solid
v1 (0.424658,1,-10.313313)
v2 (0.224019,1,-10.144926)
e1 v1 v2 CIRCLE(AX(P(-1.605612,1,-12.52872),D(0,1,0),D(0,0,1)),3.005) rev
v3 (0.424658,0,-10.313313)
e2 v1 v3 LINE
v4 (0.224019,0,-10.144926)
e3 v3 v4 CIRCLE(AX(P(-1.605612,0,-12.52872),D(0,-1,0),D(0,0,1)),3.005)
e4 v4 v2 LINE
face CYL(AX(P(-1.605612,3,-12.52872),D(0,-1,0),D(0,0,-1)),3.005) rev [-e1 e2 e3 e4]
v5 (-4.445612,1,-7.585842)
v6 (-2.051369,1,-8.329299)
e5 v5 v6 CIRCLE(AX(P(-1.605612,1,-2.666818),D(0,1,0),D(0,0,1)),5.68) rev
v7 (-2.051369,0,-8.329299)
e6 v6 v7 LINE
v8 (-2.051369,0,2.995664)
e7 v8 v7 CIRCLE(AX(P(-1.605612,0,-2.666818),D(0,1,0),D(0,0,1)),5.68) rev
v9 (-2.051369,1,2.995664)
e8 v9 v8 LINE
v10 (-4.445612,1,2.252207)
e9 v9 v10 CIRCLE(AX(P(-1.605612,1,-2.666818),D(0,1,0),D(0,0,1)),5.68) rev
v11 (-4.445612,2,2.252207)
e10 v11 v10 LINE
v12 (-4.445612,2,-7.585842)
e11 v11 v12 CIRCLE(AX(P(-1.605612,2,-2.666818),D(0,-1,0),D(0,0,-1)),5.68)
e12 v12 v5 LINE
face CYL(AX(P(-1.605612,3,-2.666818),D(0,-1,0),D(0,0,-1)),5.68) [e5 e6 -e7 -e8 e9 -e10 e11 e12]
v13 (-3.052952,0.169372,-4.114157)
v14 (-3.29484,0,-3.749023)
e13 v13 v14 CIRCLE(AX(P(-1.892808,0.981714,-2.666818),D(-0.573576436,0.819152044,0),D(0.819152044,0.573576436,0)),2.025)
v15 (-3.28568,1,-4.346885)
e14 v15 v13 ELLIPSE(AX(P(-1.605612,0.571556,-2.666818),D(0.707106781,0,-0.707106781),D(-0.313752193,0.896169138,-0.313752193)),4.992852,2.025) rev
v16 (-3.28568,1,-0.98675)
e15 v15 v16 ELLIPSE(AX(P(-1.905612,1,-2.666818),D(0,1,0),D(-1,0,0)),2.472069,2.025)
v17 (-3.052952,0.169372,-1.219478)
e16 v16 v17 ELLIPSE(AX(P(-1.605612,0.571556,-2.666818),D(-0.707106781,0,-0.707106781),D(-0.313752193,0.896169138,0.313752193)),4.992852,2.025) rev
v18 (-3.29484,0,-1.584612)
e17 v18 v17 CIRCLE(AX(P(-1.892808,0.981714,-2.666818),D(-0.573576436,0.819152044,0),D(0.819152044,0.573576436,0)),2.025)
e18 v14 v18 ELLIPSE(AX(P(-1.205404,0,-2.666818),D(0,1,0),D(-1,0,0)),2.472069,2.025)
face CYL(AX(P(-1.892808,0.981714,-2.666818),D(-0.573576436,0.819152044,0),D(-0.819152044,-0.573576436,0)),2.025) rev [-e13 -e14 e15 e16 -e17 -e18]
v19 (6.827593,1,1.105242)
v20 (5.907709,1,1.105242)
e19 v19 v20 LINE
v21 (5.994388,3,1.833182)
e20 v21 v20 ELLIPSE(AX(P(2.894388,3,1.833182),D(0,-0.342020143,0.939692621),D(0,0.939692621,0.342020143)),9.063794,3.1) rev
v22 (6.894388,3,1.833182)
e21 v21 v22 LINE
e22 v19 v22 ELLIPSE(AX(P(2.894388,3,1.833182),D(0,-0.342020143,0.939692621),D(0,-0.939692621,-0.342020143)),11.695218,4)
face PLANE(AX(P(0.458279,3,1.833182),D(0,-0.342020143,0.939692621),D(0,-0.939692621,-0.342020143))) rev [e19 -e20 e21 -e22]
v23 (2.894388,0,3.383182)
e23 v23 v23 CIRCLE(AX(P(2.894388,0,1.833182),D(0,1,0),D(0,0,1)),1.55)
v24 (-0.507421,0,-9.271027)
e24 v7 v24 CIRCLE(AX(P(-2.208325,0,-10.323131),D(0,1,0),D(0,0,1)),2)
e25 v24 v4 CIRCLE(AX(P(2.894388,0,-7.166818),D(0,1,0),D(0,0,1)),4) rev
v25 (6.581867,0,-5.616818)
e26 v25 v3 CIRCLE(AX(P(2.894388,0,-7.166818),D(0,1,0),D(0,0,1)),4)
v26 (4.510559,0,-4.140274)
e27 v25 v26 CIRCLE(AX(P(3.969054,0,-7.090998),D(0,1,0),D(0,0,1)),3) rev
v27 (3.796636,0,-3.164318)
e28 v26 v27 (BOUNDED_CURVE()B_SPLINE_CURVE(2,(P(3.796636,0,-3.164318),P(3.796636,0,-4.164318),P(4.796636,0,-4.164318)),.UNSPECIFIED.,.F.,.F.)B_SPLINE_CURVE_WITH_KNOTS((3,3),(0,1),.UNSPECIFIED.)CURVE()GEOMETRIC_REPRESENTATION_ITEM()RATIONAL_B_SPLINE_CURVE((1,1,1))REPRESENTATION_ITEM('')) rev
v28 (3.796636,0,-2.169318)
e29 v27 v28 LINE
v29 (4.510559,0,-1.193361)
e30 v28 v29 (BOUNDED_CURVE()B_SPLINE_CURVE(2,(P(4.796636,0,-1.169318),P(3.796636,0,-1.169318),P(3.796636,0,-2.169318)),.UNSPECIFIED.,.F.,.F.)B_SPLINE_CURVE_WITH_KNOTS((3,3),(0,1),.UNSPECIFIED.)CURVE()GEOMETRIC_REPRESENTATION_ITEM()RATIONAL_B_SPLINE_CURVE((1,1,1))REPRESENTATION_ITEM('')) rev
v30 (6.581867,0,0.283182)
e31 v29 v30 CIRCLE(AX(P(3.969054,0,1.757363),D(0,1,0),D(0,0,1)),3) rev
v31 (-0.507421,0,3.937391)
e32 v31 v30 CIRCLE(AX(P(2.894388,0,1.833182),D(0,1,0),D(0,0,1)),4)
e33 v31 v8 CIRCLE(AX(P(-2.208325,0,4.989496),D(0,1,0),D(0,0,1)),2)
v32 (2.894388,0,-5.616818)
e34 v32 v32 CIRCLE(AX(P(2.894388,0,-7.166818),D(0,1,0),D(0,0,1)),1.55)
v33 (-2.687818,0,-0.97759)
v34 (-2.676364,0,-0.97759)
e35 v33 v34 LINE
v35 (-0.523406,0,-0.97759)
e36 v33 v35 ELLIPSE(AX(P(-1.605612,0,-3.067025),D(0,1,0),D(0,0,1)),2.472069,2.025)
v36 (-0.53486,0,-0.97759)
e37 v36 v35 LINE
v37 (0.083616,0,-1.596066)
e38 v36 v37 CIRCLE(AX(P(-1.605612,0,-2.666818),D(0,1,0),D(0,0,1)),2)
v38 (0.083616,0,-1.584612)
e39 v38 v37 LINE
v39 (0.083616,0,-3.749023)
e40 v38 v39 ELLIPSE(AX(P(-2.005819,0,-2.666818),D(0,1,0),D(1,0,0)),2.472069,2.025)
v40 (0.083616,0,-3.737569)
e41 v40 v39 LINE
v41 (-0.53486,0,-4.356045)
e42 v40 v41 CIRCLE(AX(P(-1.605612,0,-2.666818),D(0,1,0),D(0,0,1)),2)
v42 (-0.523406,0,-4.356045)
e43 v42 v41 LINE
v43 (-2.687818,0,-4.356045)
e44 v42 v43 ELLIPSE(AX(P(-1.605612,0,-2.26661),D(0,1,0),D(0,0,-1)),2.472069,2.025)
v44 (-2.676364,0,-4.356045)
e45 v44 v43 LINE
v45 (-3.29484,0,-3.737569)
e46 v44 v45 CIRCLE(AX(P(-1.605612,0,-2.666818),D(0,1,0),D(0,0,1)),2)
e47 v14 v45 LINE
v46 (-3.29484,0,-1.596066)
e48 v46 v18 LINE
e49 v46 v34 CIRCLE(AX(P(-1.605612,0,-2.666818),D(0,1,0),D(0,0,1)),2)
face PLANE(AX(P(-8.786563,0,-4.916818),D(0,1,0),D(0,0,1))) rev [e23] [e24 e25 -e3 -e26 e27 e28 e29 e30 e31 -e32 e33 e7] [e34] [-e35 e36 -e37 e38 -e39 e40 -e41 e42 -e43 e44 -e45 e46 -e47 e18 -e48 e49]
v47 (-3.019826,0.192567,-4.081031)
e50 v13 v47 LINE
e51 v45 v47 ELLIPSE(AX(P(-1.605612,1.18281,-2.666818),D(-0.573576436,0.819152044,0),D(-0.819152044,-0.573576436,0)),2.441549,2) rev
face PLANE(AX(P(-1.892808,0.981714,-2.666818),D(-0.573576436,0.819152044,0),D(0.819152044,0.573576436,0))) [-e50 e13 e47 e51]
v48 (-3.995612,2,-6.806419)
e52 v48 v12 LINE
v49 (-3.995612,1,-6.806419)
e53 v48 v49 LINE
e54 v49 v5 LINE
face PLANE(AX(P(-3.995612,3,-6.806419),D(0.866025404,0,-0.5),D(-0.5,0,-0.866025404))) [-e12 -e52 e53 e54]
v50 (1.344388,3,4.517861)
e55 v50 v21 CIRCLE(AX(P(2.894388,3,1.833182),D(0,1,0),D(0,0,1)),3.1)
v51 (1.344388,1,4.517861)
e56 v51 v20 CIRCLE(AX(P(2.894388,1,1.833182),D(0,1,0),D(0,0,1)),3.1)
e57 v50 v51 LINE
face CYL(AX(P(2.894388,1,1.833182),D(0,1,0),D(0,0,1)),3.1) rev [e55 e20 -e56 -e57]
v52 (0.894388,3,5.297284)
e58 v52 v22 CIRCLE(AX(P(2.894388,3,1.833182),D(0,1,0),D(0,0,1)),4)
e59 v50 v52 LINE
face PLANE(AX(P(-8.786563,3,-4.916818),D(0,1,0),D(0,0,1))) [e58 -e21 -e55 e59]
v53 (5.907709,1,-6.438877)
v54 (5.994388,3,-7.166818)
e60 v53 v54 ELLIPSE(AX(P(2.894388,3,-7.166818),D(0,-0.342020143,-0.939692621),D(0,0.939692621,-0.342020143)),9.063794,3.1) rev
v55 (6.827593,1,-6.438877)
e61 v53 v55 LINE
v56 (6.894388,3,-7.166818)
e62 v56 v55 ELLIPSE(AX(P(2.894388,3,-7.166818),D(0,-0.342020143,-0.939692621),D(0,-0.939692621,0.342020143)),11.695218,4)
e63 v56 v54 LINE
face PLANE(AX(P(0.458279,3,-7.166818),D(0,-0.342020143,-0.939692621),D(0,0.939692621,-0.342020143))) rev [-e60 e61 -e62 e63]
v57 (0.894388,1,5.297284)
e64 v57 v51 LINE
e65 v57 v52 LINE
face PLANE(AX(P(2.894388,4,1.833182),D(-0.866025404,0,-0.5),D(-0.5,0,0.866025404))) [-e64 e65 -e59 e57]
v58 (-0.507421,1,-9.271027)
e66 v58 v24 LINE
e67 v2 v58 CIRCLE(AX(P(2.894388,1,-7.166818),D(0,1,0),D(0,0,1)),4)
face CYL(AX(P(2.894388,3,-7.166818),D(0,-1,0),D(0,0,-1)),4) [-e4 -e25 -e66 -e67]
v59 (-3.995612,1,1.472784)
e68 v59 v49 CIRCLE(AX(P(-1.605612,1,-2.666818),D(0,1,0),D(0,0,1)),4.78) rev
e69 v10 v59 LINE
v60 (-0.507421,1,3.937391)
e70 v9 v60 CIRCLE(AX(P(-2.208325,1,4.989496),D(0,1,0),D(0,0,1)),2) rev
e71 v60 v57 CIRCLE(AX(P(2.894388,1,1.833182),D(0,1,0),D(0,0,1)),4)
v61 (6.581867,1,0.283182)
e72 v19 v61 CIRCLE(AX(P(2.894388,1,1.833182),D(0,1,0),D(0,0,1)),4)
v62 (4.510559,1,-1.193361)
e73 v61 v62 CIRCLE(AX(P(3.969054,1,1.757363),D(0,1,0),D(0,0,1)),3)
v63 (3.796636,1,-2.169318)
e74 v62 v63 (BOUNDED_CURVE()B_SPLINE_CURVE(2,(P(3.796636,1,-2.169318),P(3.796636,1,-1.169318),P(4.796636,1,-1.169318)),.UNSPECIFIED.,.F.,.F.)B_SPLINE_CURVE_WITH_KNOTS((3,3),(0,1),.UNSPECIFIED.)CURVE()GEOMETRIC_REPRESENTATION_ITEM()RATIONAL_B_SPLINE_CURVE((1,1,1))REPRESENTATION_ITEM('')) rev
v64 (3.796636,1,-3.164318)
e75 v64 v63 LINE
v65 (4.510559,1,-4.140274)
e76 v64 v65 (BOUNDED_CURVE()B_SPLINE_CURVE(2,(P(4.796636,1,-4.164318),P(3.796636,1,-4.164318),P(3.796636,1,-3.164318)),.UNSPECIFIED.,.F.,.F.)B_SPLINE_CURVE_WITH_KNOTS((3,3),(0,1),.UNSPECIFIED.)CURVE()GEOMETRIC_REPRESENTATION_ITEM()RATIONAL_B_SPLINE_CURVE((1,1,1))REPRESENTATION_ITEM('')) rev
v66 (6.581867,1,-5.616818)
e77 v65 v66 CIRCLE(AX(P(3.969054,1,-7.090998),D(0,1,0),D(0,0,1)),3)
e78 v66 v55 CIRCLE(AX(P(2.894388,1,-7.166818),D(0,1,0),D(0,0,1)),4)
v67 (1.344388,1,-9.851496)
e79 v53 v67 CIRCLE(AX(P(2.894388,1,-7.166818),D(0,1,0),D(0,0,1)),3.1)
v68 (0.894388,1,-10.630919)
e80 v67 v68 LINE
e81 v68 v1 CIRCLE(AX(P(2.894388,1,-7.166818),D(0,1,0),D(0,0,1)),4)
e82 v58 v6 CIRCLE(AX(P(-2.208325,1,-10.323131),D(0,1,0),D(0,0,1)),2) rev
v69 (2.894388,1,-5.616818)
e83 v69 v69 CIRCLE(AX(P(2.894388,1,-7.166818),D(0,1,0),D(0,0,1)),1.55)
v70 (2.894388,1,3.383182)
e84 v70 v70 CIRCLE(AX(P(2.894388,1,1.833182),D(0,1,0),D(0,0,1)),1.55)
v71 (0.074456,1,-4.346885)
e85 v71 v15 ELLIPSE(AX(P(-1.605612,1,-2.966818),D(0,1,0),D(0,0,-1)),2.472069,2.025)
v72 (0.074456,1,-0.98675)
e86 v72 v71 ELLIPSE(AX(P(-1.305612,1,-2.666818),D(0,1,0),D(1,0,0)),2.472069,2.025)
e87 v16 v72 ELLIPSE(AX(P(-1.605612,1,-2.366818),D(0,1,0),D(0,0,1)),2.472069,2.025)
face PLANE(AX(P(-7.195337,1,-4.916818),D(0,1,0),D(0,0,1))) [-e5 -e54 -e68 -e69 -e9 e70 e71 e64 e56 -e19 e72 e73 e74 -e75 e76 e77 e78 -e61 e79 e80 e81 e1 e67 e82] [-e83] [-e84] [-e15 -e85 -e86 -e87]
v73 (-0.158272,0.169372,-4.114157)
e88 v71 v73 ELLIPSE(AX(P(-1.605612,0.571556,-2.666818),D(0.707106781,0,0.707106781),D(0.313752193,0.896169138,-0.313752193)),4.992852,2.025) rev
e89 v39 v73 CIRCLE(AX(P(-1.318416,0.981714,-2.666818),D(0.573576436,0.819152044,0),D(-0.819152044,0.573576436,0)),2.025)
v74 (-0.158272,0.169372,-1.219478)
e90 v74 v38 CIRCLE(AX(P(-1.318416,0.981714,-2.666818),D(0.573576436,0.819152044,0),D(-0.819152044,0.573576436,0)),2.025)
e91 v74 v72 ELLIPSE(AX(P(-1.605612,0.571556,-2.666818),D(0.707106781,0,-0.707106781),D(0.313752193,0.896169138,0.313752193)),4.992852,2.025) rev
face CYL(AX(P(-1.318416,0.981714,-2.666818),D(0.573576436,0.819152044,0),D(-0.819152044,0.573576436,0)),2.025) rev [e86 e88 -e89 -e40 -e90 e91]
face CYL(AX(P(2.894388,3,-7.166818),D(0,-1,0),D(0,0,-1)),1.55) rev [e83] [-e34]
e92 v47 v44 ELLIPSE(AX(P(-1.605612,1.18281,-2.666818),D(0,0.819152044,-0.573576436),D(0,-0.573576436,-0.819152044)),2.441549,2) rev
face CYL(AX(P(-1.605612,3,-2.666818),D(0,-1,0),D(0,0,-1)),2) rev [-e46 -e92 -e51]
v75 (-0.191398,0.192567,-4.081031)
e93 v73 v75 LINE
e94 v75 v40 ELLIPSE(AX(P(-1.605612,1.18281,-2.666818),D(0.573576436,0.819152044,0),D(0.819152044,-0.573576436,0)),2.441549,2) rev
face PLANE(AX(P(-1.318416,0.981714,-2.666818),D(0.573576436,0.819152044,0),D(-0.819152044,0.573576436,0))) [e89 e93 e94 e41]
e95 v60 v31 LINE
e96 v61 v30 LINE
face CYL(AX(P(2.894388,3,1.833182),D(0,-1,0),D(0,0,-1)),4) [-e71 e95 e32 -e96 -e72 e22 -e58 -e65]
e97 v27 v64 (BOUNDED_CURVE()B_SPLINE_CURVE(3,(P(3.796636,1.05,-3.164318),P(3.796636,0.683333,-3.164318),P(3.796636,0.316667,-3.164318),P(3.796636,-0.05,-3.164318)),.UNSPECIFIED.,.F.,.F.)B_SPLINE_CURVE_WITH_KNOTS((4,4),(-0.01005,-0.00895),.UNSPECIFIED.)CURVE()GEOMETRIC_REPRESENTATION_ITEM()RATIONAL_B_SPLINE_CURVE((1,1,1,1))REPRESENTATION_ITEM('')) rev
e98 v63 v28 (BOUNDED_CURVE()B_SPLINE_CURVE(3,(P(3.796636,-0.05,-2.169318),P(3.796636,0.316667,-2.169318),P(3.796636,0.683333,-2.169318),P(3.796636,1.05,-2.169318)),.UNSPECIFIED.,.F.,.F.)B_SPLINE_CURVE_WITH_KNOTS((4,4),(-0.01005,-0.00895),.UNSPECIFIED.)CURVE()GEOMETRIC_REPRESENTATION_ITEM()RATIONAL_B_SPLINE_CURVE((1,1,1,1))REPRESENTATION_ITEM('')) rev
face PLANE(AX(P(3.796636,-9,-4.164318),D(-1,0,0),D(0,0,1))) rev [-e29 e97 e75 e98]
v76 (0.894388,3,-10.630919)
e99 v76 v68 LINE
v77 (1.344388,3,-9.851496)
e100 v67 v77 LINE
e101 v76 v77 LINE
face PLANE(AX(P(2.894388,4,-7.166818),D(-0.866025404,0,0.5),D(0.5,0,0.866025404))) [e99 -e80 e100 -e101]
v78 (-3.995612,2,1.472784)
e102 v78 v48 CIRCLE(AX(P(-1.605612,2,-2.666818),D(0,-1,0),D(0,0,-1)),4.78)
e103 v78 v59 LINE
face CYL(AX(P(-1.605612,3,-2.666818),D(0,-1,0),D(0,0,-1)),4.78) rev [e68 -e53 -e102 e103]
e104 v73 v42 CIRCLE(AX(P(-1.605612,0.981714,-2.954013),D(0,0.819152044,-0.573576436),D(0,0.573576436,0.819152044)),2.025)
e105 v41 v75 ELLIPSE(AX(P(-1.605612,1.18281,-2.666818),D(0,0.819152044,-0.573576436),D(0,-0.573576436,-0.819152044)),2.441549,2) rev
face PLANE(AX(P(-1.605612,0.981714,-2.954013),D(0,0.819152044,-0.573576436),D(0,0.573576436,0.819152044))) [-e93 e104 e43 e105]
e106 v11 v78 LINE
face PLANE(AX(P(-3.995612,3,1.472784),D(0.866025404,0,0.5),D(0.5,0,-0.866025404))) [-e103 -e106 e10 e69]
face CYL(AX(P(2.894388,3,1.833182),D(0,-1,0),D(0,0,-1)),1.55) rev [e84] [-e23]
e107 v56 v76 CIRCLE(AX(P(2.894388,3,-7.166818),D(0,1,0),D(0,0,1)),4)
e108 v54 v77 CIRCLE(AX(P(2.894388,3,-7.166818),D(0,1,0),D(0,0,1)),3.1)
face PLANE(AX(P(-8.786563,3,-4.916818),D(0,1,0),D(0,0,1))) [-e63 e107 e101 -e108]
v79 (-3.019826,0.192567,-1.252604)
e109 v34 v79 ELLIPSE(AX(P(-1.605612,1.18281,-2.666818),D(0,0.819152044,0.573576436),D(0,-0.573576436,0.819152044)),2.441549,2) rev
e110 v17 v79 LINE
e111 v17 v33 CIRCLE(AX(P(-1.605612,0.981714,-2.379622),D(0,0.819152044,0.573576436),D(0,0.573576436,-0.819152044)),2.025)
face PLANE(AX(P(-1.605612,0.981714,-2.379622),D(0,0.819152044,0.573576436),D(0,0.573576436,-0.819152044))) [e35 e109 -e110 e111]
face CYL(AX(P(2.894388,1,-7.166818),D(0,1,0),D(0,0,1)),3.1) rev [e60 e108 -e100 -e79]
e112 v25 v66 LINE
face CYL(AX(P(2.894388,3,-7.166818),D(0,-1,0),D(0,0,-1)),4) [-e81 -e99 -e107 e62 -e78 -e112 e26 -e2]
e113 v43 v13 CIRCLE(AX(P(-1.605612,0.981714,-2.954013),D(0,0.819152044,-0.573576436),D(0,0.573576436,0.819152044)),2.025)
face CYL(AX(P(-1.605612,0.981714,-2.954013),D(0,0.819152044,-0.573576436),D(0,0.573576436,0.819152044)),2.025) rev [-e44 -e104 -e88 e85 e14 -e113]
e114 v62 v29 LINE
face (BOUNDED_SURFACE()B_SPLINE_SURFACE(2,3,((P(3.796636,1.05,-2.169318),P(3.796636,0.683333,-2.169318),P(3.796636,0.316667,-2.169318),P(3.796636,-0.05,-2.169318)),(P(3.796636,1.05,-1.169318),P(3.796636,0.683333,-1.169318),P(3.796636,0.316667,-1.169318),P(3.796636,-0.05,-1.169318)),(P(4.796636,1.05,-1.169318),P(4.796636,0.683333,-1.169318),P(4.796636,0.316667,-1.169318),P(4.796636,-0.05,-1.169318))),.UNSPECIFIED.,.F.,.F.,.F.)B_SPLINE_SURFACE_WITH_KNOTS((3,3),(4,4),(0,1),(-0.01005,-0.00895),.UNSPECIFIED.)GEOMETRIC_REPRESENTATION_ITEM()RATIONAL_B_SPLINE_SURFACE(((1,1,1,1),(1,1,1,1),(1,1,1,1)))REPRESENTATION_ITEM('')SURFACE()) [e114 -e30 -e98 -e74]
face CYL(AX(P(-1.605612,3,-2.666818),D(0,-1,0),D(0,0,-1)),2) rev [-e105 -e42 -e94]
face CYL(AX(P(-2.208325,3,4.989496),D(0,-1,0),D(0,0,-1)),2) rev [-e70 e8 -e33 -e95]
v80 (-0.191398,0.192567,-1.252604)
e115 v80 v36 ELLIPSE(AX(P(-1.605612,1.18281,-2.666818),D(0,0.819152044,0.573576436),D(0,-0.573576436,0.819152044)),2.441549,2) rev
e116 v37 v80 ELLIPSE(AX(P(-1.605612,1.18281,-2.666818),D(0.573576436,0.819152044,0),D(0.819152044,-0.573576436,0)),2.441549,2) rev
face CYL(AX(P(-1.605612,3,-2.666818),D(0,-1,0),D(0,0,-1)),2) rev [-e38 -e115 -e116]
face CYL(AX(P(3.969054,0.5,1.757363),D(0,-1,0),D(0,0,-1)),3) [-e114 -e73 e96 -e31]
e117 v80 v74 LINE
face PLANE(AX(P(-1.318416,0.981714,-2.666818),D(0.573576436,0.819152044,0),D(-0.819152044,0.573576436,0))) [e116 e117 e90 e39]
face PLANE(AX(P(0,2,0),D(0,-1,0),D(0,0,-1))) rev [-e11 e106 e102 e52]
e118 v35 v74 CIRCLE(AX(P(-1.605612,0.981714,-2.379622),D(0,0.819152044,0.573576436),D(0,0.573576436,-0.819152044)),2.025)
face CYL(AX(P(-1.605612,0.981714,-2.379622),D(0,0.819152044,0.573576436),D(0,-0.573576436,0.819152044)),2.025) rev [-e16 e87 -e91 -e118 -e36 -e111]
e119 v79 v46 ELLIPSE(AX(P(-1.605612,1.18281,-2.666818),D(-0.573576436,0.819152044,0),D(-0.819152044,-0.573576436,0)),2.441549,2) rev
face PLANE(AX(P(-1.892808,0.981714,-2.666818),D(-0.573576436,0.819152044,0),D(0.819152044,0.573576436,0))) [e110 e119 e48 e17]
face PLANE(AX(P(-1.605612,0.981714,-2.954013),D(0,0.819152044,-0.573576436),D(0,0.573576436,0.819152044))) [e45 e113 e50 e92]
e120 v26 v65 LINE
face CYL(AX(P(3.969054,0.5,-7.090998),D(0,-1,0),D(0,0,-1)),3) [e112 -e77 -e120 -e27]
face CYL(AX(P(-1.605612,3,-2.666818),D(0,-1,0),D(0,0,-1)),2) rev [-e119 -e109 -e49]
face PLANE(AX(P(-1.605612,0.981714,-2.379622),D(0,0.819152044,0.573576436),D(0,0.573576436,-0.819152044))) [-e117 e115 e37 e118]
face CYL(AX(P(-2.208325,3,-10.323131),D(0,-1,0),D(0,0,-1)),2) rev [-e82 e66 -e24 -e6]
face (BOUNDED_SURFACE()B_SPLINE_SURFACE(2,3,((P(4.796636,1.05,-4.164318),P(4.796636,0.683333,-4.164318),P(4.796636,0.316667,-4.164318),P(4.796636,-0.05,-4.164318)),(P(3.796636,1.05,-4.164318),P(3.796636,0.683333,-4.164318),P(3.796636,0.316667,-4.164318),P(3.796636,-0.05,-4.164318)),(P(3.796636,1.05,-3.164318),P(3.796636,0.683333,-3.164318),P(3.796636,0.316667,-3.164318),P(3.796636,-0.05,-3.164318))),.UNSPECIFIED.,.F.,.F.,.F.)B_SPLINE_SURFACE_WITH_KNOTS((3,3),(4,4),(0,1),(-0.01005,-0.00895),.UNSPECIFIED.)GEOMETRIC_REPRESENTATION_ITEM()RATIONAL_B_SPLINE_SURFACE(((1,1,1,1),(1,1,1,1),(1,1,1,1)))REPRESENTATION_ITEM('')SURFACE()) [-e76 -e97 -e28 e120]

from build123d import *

# Parameters (mm, degrees)
SKETCH1_R                = 1.55
BOSS_EXTRUDE1_DEPTH      = 3
CUT_EXTRUDE1_DEPTH       = 2
SKETCH3_W                = 5.9
SKETCH3_H                = 3
BOSS_EXTRUDE2_DEPTH      = 8
SKETCH4_W                = 13.659458738
SKETCH4_H                = 9
CUT_EXTRUDE2_DEPTH       = 2
CUT_EXTRUDE2_DRAFT       = -20
SKETCH5_R                = 0.75
CUT_EXTRUDE3_DEPTH       = 1.3
CUT_EXTRUDE4_DEPTH       = 2
CUT_EXTRUDE5_DEPTH       = 2
CUT_EXTRUDE6_DEPTH       = 2
CUT_EXTRUDE7_DEPTH       = 18.586771109
CUT_EXTRUDE7_DEPTH_BACK  = 18.586771109
SKETCH11_R               = 2
SKETCH12_R               = 2.025
CUT_EXTRUDE8_DEPTH       = 6
CIRPATTERN1_COUNT        = 4
SKETCH13_W               = 4.09775222
SKETCH13_H               = 2.995
CUT_EXTRUDE9_DEPTH       = 10
CUT_EXTRUDE10_START      = -0.177953
SKETCH14_W               = 5.9
SKETCH14_H               = 1
CUT_EXTRUDE10_DEPTH      = 0.177953
FILLET1_SIZE             = 1
SKETCH17_R               = 1.662744167
BOSS_EXTRUDE4_DEPTH      = 1
SKETCH16_R               = 1.665674875
BOSS_EXTRUDE3_DEPTH      = 1
CUT_EXTRUDE11_DEPTH      = 18.453079278
CUT_EXTRUDE11_DEPTH_BACK = 18.453079278
SKETCH18_W               = 2.600219514
SKETCH18_H               = 5.959262744
CUT_EXTRUDE12_DEPTH      = 18.309245399
BOSS_EXTRUDE5_START      = -3
BOSS_EXTRUDE5_DEPTH      = 3
CUT_EXTRUDE13_DEPTH      = 3
SKETCH22_W               = 6.55065816
SKETCH22_H               = 15.562546266
CUT_EXTRUDE14_DEPTH      = 1
SKETCH23_W               = 5.9
SKETCH23_H               = 1
CUT_EXTRUDE15_DEPTH      = 6.491471
FILLET2_R                = 3


with BuildPart() as part:
    # Sketch1 → Boss-Extrude1 (new body)
    with BuildSketch(Plane(origin=(0, 0, 0), x_dir=(1, 0, 0), z_dir=(0, 1, 0))):
        with BuildLine():
            ThreePointArc((-3.635881537, 10.313312638), (-8.934039083, 9.995244626), (-9.252107096, 4.69708708))
            ThreePointArc((-9.252107096, 4.69708708), (-8.462514606, 2.666817501), (-9.252107096, 0.636547923))
            ThreePointArc((-9.252107096, 0.636547923), (-8.934039083, -4.661609623), (-3.635881537, -4.979677635))
            ThreePointArc((-3.635881537, -4.979677635), (-1.736579677, -4.192940503), (0.224018718, -4.811290568))
            ThreePointArc((0.224018718, -4.811290568), (5.628690512, -4.752701294), (6.040883178, 0.636547923))
            ThreePointArc((6.040883178, 0.636547923), (5.251290689, 2.666817501), (6.040883178, 4.69708708))
            ThreePointArc((6.040883178, 4.69708708), (5.722815166, 9.995244626), (0.42465762, 10.313312638))
            ThreePointArc((0.42465762, 10.313312638), (-1.605611959, 9.523720149), (-3.635881537, 10.313312638))
        make_face()
        with Locations(Location((-6.105611959, 7.166817501, 0), (0, 0, 270))):
            Circle(SKETCH1_R, mode=Mode.SUBTRACT)
        with Locations(Location((2.894388041, 7.166817501, 0), (0, 0, 270))):
            Circle(SKETCH1_R, mode=Mode.SUBTRACT)
        with Locations(Location((-6.105611959, -1.833182499, 0), (0, 0, 270))):
            Circle(SKETCH1_R, mode=Mode.SUBTRACT)
        with Locations(Location((2.894388041, -1.833182499, 0), (0, 0, 270))):
            Circle(SKETCH1_R, mode=Mode.SUBTRACT)
    extrude(amount=BOSS_EXTRUDE1_DEPTH)

    # Sketch2 → Cut-Extrude1 (cut)
    with BuildSketch(Plane(origin=(0, 3, 0), x_dir=(1, 0, 0), z_dir=(0, 1, 0))):
        with BuildLine():
            ThreePointArc((-3.492463443, 8.83458692), (-8.29764298, 9.358848523), (-7.773381378, 4.553668986))
            ThreePointArc((-7.773381378, 4.553668986), (-6.33006143, 2.666817501), (-7.773381378, 0.779966017))
            ThreePointArc((-7.773381378, 0.779966017), (-8.29764298, -4.02521352), (-3.492463443, -3.500951917))
            ThreePointArc((-3.492463443, -3.500951917), (-1.605611959, -2.05763197), (0.281239525, -3.500951917))
            ThreePointArc((0.281239525, -3.500951917), (5.086419063, -4.02521352), (4.56215746, 0.779966017))
            ThreePointArc((4.56215746, 0.779966017), (3.118837513, 2.666817501), (4.56215746, 4.553668986))
            ThreePointArc((4.56215746, 4.553668986), (5.086419063, 9.358848523), (0.281239525, 8.83458692))
            ThreePointArc((0.281239525, 8.83458692), (-1.605611959, 7.391266973), (-3.492463443, 8.83458692))
        make_face()
    extrude(amount=-CUT_EXTRUDE1_DEPTH, mode=Mode.SUBTRACT)

    # Sketch3 → Boss-Extrude2 (add)
    with BuildSketch(Plane(origin=(5.251290689, 0, -2.666817501), x_dir=(0, 0, -1), z_dir=(1, 0, 0))):
        with Locations((0, 1.5)):
            Rectangle(SKETCH3_W, SKETCH3_H)
    extrude(amount=BOSS_EXTRUDE2_DEPTH)


with BuildPart() as cut_extrude2_tool:
    # Sketch4 → Cut-Extrude2 (with draft: the straight prism first)
    with BuildSketch(Plane(origin=(0, 3, 0), x_dir=(1, 0, 0), z_dir=(0, 1, 0))):
        with Locations((7.288008407, 2.666817501)):
            Rectangle(SKETCH4_W, SKETCH4_H)
    extrude(amount=-CUT_EXTRUDE2_DEPTH)
    # Cut-Extrude2: the draft: its side faces are tilted about the plane it starts from
    cut_extrude2_sides = [cut_extrude2_tool.faces().sort_by_distance(p)[0] for p in [
        (7.288008407, 2, 1.833182499),
        (14.117737776, 2, -2.666817501),
        (7.288008407, 2, -7.166817501),
        (0.458279038, 2, -2.666817501),
    ]]
    draft(cut_extrude2_sides, Plane(origin=(0, 3, 0), x_dir=(1, 0, 0), z_dir=(0, 1, 0)), CUT_EXTRUDE2_DRAFT)


with BuildPart() as part_1:
    add(part.part)

    # Cut-Extrude2: cut by cut_extrude2_tool
    add(cut_extrude2_tool.part, mode=Mode.SUBTRACT)

    # Sketch5 → Cut-Extrude3 (cut)
    with BuildSketch(Plane(origin=(0, 1, 0), x_dir=(1, 0, 0), z_dir=(0, 1, 0))):
        with Locations(Location((10.394388041, 2.716817501, 0), (0, 0, 270))):
            Circle(SKETCH5_R)
    extrude(amount=-CUT_EXTRUDE3_DEPTH, mode=Mode.SUBTRACT)

    # Sketch6 → Cut-Extrude4 (cut)
    with BuildSketch(Plane(origin=(0, 3, 0), x_dir=(1, 0, 0), z_dir=(0, 1, 0))):
        with BuildLine():
            Line((-3.492463443, -3.500951917), (-3.702450132, -1.327552789))
            Line((-3.702450132, -1.327552789), (0.368176256, -0.93426223))
            Line((0.368176256, -0.93426223), (0.281239525, -3.500951917))
            ThreePointArc((0.281239525, -3.500951917), (-1.605611959, -2.432230608), (-3.492463443, -3.500951917))
        make_face()
    extrude(amount=-CUT_EXTRUDE4_DEPTH, mode=Mode.SUBTRACT)

    # Sketch9 → Cut-Extrude5 (cut)
    with BuildSketch(Plane(origin=(0, 3, 0), x_dir=(1, 0, 0), z_dir=(0, 1, 0))):
        with BuildLine():
            Line((-7.773381378, 4.553668986), (-3.245284386, 5.2751304))
            Line((-3.245284386, 5.2751304), (-4.565802385, 0.235004819))
            Line((-4.565802385, 0.235004819), (-7.773381378, 0.779966017))
            ThreePointArc((-7.773381378, 0.779966017), (-6.704660068, 2.666817501), (-7.773381378, 4.553668986))
        make_face()
    extrude(amount=-CUT_EXTRUDE5_DEPTH, mode=Mode.SUBTRACT)

    # Sketch10 → Cut-Extrude6 (cut)
    with BuildSketch(Plane(origin=(0, 3, 0), x_dir=(1, 0, 0), z_dir=(0, 1, 0))):
        with BuildLine():
            Line((-3.492463443, 8.83458692), (-4.484720145, 5.022165409))
            Line((-4.484720145, 5.022165409), (-0.857976827, 4.078235061))
            Line((-0.857976827, 4.078235061), (0.281239525, 8.83458692))
            ThreePointArc((0.281239525, 8.83458692), (-1.605611959, 7.765865611), (-3.492463443, 8.83458692))
        make_face()
    extrude(amount=-CUT_EXTRUDE6_DEPTH, mode=Mode.SUBTRACT)

    # Sketch11 → Cut-Extrude7 (cut, two sides: drawn at the far end of the back side and taken through both)
    with BuildSketch(Plane.XZ.offset(-CUT_EXTRUDE7_DEPTH_BACK)):
        with Locations(Location((-1.605611959, -2.666817501, 0), (0, 0, 90))):
            Circle(SKETCH11_R)
    extrude(amount=CUT_EXTRUDE7_DEPTH + CUT_EXTRUDE7_DEPTH_BACK, mode=Mode.SUBTRACT)

    # Sketch12 → Cut-Extrude8 (cut)
    with BuildSketch(Plane(origin=(3.468967433, 4.954198925, 0), x_dir=(0.8191520442889871, -0.5735764363510527, -5.842048773291199e-15), z_dir=(0.5735764363510527, 0.8191520442889871, 8.343310310865899e-15))):
        with Locations((-1.643071141, 2.666817501)):
            Circle(SKETCH12_R)
    cut_extrude8 = extrude(amount=-CUT_EXTRUDE8_DEPTH, mode=Mode.SUBTRACT)

    # CirPattern1: Cut-Extrude8 ×4 about axis
    cirpattern1_axis = Axis((-1.605611959, 0, -2.666817501), (0, 1, 0))
    for i in range(1, CIRPATTERN1_COUNT):
        add(cut_extrude8.rotate(cirpattern1_axis, i * 360 / CIRPATTERN1_COUNT), mode=Mode.SUBTRACT)

    # Sketch13 → Cut-Extrude9 (cut)
    with BuildSketch(Plane(origin=(0, 1, 0), x_dir=(1, 0, 0), z_dir=(0, 1, 0))):
        with Locations((5.845511931, 2.666817501)):
            Rectangle(SKETCH13_W, SKETCH13_H)
    extrude(amount=-CUT_EXTRUDE9_DEPTH, mode=Mode.SUBTRACT)

    # Sketch14 → Cut-Extrude10 (cut)
    with BuildSketch(Plane(origin=(13.251290689, 0, 0), x_dir=(0, 0, -1), z_dir=(1, 0, 0)).offset(CUT_EXTRUDE10_START)):
        with Locations((2.666817501, 0.5)):
            Rectangle(SKETCH14_W, SKETCH14_H)
    extrude(amount=CUT_EXTRUDE10_DEPTH, mode=Mode.SUBTRACT)

    # Fillet1
    # a fillet whose section is not a circle: 1 mm, written as the material it adds along each edge
    with BuildSketch(Plane(origin=(7.894388041, 1, -4.164317501), x_dir=(-1, 0, 0), z_dir=(0, -1, 0)), Plane(origin=(3.796635821, 1, -4.164317501), x_dir=(0, 0, 1), z_dir=(0, -1, 0))) as fillet1_piece_1:
        with BuildLine():
            Bezier((FILLET1_SIZE, 0), (0, 0), (0, -FILLET1_SIZE), weights=[1, 1, 1])
            Line((0, -FILLET1_SIZE), (0, 0))
            Line((0, 0), (FILLET1_SIZE, 0))
        make_face()
    extrude(amount=1)
    with BuildSketch(Plane(origin=(7.894388041, 1, -1.169317501), x_dir=(-1, 0, 0), z_dir=(0, -1, 0)), Plane(origin=(3.796635821, 1, -1.169317501), x_dir=(0, 0, -1), z_dir=(0, -1, 0))) as fillet1_piece_2:
        with BuildLine():
            Bezier((FILLET1_SIZE, 0), (0, 0), (0, FILLET1_SIZE), weights=[1, 1, 1])
            Line((0, FILLET1_SIZE), (0, 0))
            Line((0, 0), (FILLET1_SIZE, 0))
        make_face()
    extrude(amount=1)

    # Sketch17 → Boss-Extrude4 (add)
    with BuildSketch(Plane(origin=(0, 1, 0), x_dir=(1, 0, 0), z_dir=(0, 1, 0))):
        with Locations((-6.105611959, -1.833182499)):
            Circle(SKETCH17_R)
    extrude(amount=-BOSS_EXTRUDE4_DEPTH)

    # Sketch16 → Boss-Extrude3 (add)
    with BuildSketch(Plane(origin=(0, 1, 0), x_dir=(1, 0, 0), z_dir=(0, 1, 0))):
        with Locations((-6.105611959, 7.166817501)):
            Circle(SKETCH16_R)
    extrude(amount=-BOSS_EXTRUDE3_DEPTH)

    # Sketch15 → Cut-Extrude11 (cut, two sides: drawn at the far end of the back side and taken through both)
    with BuildSketch(Plane.XZ.offset(-CUT_EXTRUDE11_DEPTH_BACK)):
        with BuildLine():
            Line((6.894388041, -7.166817501), (6.894388041, -13.928074113))
            Line((6.894388041, -13.928074113), (-13.514201906, -13.928074113))
            Line((-13.514201906, -13.928074113), (-13.514201906, 8.046636231))
            Line((-13.514201906, 8.046636231), (6.894388041, 8.046636231))
            Line((6.894388041, 8.046636231), (6.894388041, 1.833182499))
            ThreePointArc((6.894388041, 1.833182499), (3.988180525, 5.68072951), (-0.50742096, 3.9373915))
            ThreePointArc((-0.50742096, 3.9373915), (-1.166872385, 3.282048931), (-2.051368819, 2.995664359))
            ThreePointArc((-2.051368819, 2.995664359), (-7.285611959, -2.666817501), (-2.051368819, -8.329299362))
            ThreePointArc((-2.051368819, -8.329299362), (-1.166872385, -8.615683934), (-0.50742096, -9.271026503))
            ThreePointArc((-0.50742096, -9.271026503), (3.988180525, -11.014364512), (6.894388041, -7.166817501))
        make_face()
    extrude(amount=CUT_EXTRUDE11_DEPTH + CUT_EXTRUDE11_DEPTH_BACK, mode=Mode.SUBTRACT)

    # Sketch18 → Cut-Extrude12 (cut, through all)
    with BuildSketch(Plane(origin=(0, 1, 0), x_dir=(1, 0, 0), z_dir=(0, 1, 0))):
        with Locations((-7.701659958, 2.979631372)):
            Rectangle(SKETCH18_W, SKETCH18_H)
    extrude(amount=CUT_EXTRUDE12_DEPTH, mode=Mode.SUBTRACT)

    # Sketch19 → Boss-Extrude5 (add)
    with BuildSketch(Plane.XZ.offset(BOSS_EXTRUDE5_START)):
        with BuildLine():
            Line((-3.995611959, -6.806418932), (-4.445611959, -7.585841795))
            ThreePointArc((-4.445611959, -7.585841795), (-7.285611959, -2.666817501), (-4.445611959, 2.252206792))
            Line((-4.445611959, 2.252206792), (-3.995611959, 1.472783929))
            ThreePointArc((-3.995611959, 1.472783929), (-6.385611959, -2.666817501), (-3.995611959, -6.806418932))
        make_face()
    extrude(amount=BOSS_EXTRUDE5_DEPTH)

    # Sketch20 → Cut-Extrude13 (cut)
    with BuildSketch(Plane(origin=(0, 1, 0), x_dir=(1, 0, 0), z_dir=(0, 1, 0))):
        Polygon((2.894388041, 7.166817501), (-0.075580701, 12.31095426), (-3.796704653, 11.559770235), (-3.289503394, -7.421479647), (-0.182006076, -7.161653415), (2.894388041, -1.833182499), align=None)
    extrude(amount=CUT_EXTRUDE13_DEPTH, mode=Mode.SUBTRACT)

    # Sketch22 → Cut-Extrude14 (cut)
    with BuildSketch(Plane(origin=(0, 3, 0), x_dir=(1, 0, 0), z_dir=(0, 1, 0))):
        with Locations((-5.379656345, 2.553222273)):
            Rectangle(SKETCH22_W, SKETCH22_H)
    extrude(amount=-CUT_EXTRUDE14_DEPTH, mode=Mode.SUBTRACT)

    # Sketch23 → Cut-Extrude15 (cut)
    with BuildSketch(Plane(origin=(13.073337513, 0, 0), x_dir=(0, 0, -1), z_dir=(1, 0, 0))):
        with Locations((2.666817501, 0.5)):
            Rectangle(SKETCH23_W, SKETCH23_H)
    extrude(amount=-CUT_EXTRUDE15_DEPTH, mode=Mode.SUBTRACT)

    # Fillet2
    # the kernel refuses this fillet: 3 mm, written as the material it takes off along each edge
    with BuildSketch(Plane(origin=(6.581866513, 6.178617069, -4.164317501), x_dir=(-0.999932634511536, 1.396498453398939e-14, 0.011607171869965063), z_dir=(0, -1, 0)), Plane(origin=(6.581866513, -5.178617069, -1.169317501), x_dir=(-0.999932634511536, 1.3964984533989391e-14, -0.01160717186996909), z_dir=(0, 1, 0))) as fillet2_piece_1:
        with BuildLine():
            CenterArc((2.578666289, 2.956810514), FILLET2_R, 210.097266111, 50.168799246)
            Line((-0.016859759, 1.452402148), (-0.276412364, 1.301961311))
            ThreePointArc((-0.276412364, 1.301961311), (-0.308409499, 0.722718924), (-0.29997979, -0.003482152))
            Line((-0.29997979, -0.003482152), (0.003482152, -0.29997979))
            ThreePointArc((0.003482152, -0.29997979), (1.788592581, -0.279258311), (2.020724882, -0.295681051))
            Line((2.020724882, -0.295681051), (2.071446828, 0))
        make_face()
    extrude(amount=11.357234139, mode=Mode.SUBTRACT)


solid = part_1.part
